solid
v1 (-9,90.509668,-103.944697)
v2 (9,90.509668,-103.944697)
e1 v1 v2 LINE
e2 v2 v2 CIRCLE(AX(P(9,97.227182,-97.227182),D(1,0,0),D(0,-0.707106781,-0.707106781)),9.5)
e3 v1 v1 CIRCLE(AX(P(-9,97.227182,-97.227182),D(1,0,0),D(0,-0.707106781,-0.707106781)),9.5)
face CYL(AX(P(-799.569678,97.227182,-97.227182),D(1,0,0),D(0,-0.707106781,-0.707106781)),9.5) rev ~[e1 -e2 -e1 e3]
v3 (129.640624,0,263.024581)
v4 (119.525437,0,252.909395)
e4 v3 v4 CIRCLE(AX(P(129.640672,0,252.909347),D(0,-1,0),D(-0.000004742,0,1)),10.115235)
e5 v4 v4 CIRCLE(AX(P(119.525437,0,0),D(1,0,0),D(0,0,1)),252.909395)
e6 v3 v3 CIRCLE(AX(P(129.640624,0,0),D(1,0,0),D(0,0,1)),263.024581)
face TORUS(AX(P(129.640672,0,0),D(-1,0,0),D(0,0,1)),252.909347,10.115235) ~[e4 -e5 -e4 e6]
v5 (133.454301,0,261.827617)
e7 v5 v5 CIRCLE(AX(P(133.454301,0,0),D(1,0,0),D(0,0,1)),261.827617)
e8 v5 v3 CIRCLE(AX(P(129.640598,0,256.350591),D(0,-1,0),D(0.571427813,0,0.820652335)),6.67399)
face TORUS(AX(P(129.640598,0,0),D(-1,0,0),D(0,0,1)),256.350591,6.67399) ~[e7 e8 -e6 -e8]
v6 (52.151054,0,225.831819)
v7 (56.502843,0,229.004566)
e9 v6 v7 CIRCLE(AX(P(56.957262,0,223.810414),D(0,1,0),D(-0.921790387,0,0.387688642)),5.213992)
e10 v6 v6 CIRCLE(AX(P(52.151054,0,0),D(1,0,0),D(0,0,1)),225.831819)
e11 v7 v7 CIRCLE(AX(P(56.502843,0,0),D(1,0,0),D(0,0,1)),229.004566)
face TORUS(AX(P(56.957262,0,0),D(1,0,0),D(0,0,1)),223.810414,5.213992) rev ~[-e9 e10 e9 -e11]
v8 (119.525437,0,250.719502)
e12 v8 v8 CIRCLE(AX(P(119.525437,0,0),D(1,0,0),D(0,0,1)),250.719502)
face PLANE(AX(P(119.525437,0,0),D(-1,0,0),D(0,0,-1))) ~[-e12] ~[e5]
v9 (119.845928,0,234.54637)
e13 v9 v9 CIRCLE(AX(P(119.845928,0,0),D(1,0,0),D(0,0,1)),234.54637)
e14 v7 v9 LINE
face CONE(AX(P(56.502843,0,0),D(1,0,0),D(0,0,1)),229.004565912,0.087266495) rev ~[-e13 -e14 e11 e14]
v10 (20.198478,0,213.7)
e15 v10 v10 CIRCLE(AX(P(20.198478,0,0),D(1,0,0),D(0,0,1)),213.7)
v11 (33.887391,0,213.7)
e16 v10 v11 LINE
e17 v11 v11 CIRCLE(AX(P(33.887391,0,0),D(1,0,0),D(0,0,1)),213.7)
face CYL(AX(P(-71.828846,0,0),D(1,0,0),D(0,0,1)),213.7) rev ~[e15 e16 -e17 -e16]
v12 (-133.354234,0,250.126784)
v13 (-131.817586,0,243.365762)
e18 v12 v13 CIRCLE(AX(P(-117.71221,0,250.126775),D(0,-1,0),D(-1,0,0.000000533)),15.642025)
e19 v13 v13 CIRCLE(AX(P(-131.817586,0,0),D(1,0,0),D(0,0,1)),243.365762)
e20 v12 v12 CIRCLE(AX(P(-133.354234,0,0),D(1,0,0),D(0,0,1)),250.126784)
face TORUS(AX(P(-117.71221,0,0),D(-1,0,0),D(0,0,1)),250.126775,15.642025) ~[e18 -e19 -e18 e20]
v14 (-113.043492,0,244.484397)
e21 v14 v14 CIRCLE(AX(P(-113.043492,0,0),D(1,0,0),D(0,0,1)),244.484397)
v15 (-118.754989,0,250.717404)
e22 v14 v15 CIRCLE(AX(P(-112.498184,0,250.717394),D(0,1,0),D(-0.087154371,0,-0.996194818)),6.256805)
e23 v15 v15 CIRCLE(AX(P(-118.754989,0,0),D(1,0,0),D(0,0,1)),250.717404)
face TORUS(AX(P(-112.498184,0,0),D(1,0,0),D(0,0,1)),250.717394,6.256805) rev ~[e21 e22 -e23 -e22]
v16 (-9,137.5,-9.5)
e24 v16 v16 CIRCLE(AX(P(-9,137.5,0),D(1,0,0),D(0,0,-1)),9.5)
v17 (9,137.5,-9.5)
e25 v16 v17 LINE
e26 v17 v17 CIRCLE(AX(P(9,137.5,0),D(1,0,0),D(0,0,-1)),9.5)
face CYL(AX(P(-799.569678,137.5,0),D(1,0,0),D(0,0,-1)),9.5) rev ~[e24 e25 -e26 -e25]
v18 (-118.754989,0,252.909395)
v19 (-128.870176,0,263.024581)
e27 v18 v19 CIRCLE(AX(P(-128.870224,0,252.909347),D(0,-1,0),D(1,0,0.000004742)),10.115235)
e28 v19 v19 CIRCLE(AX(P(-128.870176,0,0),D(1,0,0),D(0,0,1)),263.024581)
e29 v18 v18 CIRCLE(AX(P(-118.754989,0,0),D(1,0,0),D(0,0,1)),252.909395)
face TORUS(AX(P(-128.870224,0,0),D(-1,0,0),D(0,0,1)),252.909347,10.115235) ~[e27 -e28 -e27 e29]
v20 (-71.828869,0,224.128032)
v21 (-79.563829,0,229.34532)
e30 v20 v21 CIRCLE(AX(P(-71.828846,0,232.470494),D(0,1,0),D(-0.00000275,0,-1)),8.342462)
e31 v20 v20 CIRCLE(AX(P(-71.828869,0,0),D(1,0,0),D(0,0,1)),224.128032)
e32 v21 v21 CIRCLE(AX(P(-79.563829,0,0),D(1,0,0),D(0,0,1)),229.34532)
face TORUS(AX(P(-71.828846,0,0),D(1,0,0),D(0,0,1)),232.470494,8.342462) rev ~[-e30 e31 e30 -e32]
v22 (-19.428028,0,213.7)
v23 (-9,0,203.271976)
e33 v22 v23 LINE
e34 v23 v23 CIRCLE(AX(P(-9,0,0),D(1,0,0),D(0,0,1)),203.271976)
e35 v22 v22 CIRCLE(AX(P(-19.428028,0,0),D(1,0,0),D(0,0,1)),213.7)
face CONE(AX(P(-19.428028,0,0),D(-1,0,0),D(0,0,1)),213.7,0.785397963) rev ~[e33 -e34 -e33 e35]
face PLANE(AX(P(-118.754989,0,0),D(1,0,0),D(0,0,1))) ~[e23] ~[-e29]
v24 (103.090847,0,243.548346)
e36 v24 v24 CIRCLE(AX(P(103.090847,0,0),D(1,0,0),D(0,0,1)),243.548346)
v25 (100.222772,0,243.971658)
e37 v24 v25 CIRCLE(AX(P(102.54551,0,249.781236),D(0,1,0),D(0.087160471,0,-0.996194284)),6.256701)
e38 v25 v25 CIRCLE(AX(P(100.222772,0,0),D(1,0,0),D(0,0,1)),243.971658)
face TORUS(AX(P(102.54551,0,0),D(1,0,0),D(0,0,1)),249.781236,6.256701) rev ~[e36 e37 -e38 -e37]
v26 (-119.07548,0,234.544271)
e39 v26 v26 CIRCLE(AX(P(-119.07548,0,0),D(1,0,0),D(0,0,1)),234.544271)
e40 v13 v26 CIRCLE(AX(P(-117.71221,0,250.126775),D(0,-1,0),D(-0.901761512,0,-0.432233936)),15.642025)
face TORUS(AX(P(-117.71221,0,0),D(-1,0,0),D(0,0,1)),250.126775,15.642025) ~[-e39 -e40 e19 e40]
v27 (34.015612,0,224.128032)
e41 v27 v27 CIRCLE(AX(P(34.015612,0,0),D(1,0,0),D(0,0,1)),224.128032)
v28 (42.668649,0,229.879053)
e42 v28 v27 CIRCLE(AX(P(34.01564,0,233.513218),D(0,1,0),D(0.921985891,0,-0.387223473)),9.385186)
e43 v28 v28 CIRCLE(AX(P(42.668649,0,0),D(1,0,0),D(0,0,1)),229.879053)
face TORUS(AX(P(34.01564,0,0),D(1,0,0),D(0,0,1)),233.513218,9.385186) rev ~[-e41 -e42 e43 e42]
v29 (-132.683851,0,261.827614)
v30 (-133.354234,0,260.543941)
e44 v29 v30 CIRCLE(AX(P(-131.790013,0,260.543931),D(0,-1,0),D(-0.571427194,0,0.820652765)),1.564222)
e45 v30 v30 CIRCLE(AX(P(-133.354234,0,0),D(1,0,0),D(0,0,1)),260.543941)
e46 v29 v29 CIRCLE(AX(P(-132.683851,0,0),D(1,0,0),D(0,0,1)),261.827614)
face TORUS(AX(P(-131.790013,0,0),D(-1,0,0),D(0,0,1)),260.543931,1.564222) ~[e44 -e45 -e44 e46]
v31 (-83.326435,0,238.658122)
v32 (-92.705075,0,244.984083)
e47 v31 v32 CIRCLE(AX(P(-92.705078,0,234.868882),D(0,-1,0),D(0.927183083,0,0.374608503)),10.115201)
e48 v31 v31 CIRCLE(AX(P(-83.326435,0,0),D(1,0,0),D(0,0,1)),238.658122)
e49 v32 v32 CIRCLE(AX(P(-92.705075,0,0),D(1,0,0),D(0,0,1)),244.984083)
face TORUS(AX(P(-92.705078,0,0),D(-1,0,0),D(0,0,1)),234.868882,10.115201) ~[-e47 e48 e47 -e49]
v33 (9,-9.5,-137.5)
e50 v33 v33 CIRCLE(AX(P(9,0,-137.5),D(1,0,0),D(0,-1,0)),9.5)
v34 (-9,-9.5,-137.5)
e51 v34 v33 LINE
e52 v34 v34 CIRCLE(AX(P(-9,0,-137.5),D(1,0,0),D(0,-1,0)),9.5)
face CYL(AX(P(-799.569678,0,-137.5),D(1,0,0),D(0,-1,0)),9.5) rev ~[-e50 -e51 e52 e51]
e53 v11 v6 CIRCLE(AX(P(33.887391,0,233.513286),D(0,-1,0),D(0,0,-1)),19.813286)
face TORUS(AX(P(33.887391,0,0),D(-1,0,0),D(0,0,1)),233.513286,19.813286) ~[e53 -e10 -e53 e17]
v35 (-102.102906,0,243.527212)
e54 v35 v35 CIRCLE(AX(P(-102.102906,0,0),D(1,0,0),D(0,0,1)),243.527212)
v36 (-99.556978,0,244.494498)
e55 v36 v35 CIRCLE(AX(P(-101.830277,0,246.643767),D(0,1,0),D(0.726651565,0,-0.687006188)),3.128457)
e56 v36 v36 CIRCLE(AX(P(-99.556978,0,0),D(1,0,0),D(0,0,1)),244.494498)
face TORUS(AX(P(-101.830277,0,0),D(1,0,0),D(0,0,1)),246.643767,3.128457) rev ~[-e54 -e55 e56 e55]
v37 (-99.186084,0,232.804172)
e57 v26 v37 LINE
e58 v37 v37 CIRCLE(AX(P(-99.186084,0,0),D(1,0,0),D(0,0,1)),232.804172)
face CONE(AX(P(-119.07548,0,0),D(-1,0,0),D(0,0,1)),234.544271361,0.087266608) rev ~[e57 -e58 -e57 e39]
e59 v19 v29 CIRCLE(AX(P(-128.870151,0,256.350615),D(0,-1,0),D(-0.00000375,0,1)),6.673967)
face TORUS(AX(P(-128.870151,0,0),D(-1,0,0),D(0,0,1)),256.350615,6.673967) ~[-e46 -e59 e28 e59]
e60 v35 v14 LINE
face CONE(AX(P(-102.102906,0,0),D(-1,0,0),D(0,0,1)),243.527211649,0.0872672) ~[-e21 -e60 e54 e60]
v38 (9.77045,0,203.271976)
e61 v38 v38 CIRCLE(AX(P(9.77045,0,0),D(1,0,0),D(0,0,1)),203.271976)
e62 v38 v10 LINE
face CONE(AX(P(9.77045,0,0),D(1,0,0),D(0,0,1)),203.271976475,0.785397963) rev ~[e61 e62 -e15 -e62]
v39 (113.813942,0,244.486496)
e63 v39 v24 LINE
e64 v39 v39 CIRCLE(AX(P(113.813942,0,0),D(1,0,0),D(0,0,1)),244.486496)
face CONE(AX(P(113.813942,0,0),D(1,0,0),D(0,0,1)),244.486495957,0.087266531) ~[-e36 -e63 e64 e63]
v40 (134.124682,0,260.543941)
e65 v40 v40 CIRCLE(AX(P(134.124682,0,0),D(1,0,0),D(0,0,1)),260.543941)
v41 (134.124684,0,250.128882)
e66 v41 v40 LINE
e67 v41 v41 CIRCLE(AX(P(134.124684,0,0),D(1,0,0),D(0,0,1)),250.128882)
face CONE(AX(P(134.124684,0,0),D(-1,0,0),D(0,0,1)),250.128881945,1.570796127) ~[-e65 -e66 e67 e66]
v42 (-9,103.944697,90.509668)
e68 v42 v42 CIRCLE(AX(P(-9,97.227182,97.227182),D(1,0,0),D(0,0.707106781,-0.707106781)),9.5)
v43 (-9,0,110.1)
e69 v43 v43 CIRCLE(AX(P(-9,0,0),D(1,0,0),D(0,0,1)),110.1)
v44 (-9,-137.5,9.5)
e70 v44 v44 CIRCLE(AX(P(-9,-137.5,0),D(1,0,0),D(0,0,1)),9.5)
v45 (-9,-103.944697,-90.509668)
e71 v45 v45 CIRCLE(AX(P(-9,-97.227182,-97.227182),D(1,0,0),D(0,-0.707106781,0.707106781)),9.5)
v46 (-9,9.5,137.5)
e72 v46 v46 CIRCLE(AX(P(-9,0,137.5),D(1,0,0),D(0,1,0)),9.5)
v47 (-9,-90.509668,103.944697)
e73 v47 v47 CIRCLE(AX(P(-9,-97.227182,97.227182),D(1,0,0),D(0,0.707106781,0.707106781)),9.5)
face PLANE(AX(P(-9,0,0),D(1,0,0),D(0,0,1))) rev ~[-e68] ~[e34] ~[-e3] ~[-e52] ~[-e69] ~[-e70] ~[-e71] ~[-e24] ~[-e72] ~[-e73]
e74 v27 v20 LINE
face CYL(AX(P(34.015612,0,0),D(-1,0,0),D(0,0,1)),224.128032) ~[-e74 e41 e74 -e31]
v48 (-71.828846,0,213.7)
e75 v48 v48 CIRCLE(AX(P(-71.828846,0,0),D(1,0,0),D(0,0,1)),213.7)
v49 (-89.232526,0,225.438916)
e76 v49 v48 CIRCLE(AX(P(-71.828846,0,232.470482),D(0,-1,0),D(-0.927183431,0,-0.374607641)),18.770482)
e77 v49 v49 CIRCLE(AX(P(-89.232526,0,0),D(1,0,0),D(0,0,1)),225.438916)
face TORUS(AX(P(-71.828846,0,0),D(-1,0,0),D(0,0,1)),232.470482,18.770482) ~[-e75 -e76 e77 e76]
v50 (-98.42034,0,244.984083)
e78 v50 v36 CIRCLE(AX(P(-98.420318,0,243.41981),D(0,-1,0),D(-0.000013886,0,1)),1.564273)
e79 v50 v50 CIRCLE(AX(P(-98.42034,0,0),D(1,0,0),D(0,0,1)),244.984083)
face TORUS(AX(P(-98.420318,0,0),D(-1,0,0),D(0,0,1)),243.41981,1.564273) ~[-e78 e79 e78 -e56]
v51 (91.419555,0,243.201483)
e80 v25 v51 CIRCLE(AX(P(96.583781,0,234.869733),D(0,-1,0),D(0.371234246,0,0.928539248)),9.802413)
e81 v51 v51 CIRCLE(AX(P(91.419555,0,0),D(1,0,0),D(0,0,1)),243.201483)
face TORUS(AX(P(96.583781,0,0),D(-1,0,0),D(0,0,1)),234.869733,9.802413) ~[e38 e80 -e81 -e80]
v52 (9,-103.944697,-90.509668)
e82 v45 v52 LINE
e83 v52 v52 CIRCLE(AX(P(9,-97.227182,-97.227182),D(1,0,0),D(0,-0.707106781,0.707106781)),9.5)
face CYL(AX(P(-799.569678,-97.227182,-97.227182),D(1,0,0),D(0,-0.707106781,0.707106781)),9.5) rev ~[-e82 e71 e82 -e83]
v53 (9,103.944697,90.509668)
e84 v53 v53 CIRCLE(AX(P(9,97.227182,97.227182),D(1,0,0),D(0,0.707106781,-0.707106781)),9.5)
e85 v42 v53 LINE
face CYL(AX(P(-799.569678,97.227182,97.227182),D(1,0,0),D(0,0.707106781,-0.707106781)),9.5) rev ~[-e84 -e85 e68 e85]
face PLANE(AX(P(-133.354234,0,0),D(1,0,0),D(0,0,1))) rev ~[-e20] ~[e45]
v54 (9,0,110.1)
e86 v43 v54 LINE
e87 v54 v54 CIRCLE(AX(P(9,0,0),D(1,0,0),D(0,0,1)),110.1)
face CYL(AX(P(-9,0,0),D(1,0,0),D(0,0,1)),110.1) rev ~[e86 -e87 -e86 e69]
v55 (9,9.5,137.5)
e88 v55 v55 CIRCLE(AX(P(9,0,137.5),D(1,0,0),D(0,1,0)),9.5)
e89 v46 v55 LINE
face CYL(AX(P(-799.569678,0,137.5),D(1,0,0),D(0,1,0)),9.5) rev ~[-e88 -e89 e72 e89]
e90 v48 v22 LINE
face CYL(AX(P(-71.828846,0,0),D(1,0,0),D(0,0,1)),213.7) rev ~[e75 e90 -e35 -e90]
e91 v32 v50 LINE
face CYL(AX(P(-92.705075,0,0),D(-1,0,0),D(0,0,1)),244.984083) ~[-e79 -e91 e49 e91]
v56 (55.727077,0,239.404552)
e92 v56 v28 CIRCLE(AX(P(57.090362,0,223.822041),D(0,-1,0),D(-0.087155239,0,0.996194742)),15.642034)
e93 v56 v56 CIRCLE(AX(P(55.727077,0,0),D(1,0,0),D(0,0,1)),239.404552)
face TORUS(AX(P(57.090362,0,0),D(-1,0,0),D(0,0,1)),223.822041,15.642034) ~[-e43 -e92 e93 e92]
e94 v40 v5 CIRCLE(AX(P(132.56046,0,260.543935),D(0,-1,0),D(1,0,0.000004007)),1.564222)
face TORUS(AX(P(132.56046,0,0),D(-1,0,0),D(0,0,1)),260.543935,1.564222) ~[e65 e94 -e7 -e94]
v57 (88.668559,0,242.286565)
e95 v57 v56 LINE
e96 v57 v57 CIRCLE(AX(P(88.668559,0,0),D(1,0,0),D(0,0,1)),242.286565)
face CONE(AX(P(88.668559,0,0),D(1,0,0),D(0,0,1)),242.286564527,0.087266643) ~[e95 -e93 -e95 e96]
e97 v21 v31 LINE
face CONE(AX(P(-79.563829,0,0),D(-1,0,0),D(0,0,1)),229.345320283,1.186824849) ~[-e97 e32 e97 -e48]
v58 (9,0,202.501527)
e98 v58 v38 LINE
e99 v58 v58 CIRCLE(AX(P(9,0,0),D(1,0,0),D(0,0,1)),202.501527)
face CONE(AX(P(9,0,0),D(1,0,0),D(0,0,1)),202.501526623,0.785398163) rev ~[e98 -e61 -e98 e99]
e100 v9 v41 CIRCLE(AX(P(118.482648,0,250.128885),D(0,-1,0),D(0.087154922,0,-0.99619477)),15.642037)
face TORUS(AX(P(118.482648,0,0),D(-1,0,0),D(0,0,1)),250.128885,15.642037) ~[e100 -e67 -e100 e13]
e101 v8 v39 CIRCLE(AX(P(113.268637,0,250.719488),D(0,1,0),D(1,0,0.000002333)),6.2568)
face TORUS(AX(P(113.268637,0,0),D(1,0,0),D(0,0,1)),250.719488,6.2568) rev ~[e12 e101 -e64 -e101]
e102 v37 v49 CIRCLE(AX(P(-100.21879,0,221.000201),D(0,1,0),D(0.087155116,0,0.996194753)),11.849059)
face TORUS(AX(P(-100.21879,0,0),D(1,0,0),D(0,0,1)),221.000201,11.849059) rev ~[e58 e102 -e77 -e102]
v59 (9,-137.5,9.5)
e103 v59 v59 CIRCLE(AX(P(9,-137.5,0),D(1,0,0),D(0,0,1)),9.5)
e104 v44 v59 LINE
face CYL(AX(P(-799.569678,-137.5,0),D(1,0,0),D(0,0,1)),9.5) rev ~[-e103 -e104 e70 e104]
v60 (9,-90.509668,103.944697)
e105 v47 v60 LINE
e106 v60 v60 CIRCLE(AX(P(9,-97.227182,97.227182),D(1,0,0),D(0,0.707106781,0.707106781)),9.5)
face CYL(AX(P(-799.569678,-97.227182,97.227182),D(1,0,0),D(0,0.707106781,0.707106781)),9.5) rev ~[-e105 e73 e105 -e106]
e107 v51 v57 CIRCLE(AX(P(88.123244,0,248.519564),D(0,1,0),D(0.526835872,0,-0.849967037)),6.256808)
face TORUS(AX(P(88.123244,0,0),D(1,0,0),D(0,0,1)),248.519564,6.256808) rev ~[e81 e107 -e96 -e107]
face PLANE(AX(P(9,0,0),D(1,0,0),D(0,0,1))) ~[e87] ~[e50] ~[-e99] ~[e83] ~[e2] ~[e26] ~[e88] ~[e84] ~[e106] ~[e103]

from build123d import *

# Parameters (mm, degrees)
F2_SCALE        = 2
F4_D            = 19
F4_COPIES_COUNT = 8


# Not quite as in the source:
# - ends of sketch curves that miss each other by under 0.0002 mm in the source are joined
# - a pattern or mirror of a feature is missing from the dataset's text; its kind, count and spacing are read off the source's solid


with BuildPart() as f1:
    # F0 (on Front) → F1 (revolve)
    with BuildSketch(Plane.XZ):
        with BuildLine():
            Line((-59.3774947068, 125.3587021862), (-59.3774947068, 126.4546972823))
            ThreePointArc((-59.3774947068, 126.4546972823), (-60.8588365516, 130.03094887), (-64.4350881393, 131.5122907147))
            ThreePointArc((-64.4350881393, 131.5122907147), (-65.4343638443, 131.3591542469), (-66.3419257453, 130.9138070696))
            ThreePointArc((-66.3419257453, 130.9138070696), (-66.5882719889, 130.63401554), (-66.6771172223, 130.2719706726))
            Line((-66.6771172223, 130.2719706726), (-66.6771172223, 125.0633919127))
            ThreePointArc((-66.6771172223, 125.0633919127), (-66.482618085, 123.3300296057), (-65.9087927875, 121.682880757))
            ThreePointArc((-65.9087927875, 121.682880757), (-63.307914247, 118.6330200999), (-59.5377401385, 117.2721356805))
            Line((-59.5377401385, 117.2721356805), (-49.5930421254, 116.4020858831))
            ThreePointArc((-49.5930421254, 116.4020858831), (-46.5853470395, 115.2625721401), (-44.6162629101, 112.7194580906))
            ThreePointArc((-44.6162629101, 112.7194580906), (-41.1625787231, 108.4545206728), (-35.9144230058, 106.85))
            Line((-35.9144230058, 106.85), (-9.7140138479, 106.85))
            Line((-9.7140138479, 106.85), (-4.5, 106.85))
            Line((-4.5, 106.85), (4.5, 106.85))
            Line((4.5, 106.85), (10.0992387742, 106.85))
            Line((10.0992387742, 106.85), (16.9436956085, 106.85))
            ThreePointArc((16.9436956085, 106.85), (22.4251553149, 108.5046629344), (26.0755268905, 112.9159096174))
            ThreePointArc((26.0755268905, 112.9159096174), (26.9427979858, 114.0117789594), (28.2514212765, 114.5022829559))
            Line((28.2514212765, 114.5022829559), (59.9229640063, 117.2731849198))
            ThreePointArc((59.9229640063, 117.2731849198), (65.0075805706, 119.7806360461), (67.0623421486, 125.0644409723))
            Line((67.0623421486, 125.0644409723), (67.0623411058, 130.2719706726))
            ThreePointArc((67.0623411058, 130.2719706726), (66.9734967171, 130.6340159193), (66.7271505795, 130.9138084349))
            ThreePointArc((66.7271505795, 130.9138084349), (65.8195878649, 131.3591545311), (64.8203120228, 131.5122907148))
            ThreePointArc((64.8203120228, 131.5122907148), (61.2440604351, 130.03094887), (59.7627185904, 126.4546972823))
            Line((59.7627185904, 126.4546972823), (59.7627185903, 125.3597512458))
            ThreePointArc((59.7627185903, 125.3597512458), (58.9408175176, 123.2462281069), (56.9069708435, 122.2432479785))
            Line((56.9069708435, 122.2432479785), (51.5454233807, 121.7741729888))
            ThreePointArc((51.5454233807, 121.7741729888), (50.8159764062, 121.7957947298), (50.1113861259, 121.9858287981))
            ThreePointArc((50.1113861259, 121.9858287981), (47.8647261886, 122.3174224608), (45.70977758, 121.6007415585))
            ThreePointArc((45.70977758, 121.6007415585), (45.0488899564, 121.2912445121), (44.3342795748, 121.1432822635))
            Line((44.3342795748, 121.1432822635), (27.863538289, 119.7022761349))
            ThreePointArc((27.863538289, 119.7022761349), (23.9360777257, 118.2296017987), (21.334324273, 114.9395266697))
            ThreePointArc((21.334324273, 114.9395266697), (19.6052745797, 112.8484561771), (17.00780608, 112.0640159336))
            Line((17.00780608, 112.0640159336), (-35.9144344767, 112.0640159335))
            ThreePointArc((-35.9144344767, 112.0640159335), (-38.2469432811, 112.7771380477), (-39.7819144418, 114.6726601416))
            Line((-39.7819144418, 114.6726601416), (-41.6632173981, 119.3290611948))
            ThreePointArc((-41.6632173981, 119.3290611948), (-43.5243685327, 121.6273844601), (-46.3525377329, 122.4920415438))
            Line((-46.3525377329, 122.4920415438), (-49.2101697889, 122.4920415438))
            ThreePointArc((-49.2101697889, 122.4920415438), (-49.5195674906, 122.4282391081), (-49.7784889992, 122.2472488486))
            ThreePointArc((-49.7784889992, 122.2472488486), (-50.3595799373, 121.8596366017), (-51.0514529348, 121.7636058247))
            Line((-51.0514529348, 121.7636058247), (-56.5217459526, 122.2421985139))
            ThreePointArc((-56.5217459526, 122.2421985139), (-58.5555925913, 123.2451790473), (-59.3774947068, 125.3587021862))
        make_face()
        Polygon((-4.5, 106.85), (-9.7140138479, 106.85), (-4.5, 101.6359882377), align=None)
        Polygon((-4.5, 106.85), (-4.5, 101.6359882377), (-4.5, 55.05), (4.5, 55.05), (4.5, 101.2507633114), (4.5, 106.85), align=None)
        Polygon((10.0992387742, 106.85), (4.5, 106.85), (4.5, 101.2507633114), (4.8852249263, 101.6359882377), align=None)
    revolve(axis=Axis((0, 0, 0), (1, 0, 0)))


with BuildPart() as f1_1:
    # F2: moved
    add(f1.part.scale(F2_SCALE))

    # F4 (through all)
    with Locations(Plane(origin=(-9, 0, 0), x_dir=(0, -1, 0), z_dir=(-1, 0, 0))):
        with Locations((0, 137.5)):
            f4 = Hole(F4_D / 2)

    # F4_copies: F4 ×8 about axis
    f4_copies_axis = Axis((0, 0, 0), (1, 0, 0))
    for i in range(1, F4_COPIES_COUNT):
        add(f4.rotate(f4_copies_axis, i * 360 / F4_COPIES_COUNT), mode=Mode.SUBTRACT)


solid = f1_1.part
